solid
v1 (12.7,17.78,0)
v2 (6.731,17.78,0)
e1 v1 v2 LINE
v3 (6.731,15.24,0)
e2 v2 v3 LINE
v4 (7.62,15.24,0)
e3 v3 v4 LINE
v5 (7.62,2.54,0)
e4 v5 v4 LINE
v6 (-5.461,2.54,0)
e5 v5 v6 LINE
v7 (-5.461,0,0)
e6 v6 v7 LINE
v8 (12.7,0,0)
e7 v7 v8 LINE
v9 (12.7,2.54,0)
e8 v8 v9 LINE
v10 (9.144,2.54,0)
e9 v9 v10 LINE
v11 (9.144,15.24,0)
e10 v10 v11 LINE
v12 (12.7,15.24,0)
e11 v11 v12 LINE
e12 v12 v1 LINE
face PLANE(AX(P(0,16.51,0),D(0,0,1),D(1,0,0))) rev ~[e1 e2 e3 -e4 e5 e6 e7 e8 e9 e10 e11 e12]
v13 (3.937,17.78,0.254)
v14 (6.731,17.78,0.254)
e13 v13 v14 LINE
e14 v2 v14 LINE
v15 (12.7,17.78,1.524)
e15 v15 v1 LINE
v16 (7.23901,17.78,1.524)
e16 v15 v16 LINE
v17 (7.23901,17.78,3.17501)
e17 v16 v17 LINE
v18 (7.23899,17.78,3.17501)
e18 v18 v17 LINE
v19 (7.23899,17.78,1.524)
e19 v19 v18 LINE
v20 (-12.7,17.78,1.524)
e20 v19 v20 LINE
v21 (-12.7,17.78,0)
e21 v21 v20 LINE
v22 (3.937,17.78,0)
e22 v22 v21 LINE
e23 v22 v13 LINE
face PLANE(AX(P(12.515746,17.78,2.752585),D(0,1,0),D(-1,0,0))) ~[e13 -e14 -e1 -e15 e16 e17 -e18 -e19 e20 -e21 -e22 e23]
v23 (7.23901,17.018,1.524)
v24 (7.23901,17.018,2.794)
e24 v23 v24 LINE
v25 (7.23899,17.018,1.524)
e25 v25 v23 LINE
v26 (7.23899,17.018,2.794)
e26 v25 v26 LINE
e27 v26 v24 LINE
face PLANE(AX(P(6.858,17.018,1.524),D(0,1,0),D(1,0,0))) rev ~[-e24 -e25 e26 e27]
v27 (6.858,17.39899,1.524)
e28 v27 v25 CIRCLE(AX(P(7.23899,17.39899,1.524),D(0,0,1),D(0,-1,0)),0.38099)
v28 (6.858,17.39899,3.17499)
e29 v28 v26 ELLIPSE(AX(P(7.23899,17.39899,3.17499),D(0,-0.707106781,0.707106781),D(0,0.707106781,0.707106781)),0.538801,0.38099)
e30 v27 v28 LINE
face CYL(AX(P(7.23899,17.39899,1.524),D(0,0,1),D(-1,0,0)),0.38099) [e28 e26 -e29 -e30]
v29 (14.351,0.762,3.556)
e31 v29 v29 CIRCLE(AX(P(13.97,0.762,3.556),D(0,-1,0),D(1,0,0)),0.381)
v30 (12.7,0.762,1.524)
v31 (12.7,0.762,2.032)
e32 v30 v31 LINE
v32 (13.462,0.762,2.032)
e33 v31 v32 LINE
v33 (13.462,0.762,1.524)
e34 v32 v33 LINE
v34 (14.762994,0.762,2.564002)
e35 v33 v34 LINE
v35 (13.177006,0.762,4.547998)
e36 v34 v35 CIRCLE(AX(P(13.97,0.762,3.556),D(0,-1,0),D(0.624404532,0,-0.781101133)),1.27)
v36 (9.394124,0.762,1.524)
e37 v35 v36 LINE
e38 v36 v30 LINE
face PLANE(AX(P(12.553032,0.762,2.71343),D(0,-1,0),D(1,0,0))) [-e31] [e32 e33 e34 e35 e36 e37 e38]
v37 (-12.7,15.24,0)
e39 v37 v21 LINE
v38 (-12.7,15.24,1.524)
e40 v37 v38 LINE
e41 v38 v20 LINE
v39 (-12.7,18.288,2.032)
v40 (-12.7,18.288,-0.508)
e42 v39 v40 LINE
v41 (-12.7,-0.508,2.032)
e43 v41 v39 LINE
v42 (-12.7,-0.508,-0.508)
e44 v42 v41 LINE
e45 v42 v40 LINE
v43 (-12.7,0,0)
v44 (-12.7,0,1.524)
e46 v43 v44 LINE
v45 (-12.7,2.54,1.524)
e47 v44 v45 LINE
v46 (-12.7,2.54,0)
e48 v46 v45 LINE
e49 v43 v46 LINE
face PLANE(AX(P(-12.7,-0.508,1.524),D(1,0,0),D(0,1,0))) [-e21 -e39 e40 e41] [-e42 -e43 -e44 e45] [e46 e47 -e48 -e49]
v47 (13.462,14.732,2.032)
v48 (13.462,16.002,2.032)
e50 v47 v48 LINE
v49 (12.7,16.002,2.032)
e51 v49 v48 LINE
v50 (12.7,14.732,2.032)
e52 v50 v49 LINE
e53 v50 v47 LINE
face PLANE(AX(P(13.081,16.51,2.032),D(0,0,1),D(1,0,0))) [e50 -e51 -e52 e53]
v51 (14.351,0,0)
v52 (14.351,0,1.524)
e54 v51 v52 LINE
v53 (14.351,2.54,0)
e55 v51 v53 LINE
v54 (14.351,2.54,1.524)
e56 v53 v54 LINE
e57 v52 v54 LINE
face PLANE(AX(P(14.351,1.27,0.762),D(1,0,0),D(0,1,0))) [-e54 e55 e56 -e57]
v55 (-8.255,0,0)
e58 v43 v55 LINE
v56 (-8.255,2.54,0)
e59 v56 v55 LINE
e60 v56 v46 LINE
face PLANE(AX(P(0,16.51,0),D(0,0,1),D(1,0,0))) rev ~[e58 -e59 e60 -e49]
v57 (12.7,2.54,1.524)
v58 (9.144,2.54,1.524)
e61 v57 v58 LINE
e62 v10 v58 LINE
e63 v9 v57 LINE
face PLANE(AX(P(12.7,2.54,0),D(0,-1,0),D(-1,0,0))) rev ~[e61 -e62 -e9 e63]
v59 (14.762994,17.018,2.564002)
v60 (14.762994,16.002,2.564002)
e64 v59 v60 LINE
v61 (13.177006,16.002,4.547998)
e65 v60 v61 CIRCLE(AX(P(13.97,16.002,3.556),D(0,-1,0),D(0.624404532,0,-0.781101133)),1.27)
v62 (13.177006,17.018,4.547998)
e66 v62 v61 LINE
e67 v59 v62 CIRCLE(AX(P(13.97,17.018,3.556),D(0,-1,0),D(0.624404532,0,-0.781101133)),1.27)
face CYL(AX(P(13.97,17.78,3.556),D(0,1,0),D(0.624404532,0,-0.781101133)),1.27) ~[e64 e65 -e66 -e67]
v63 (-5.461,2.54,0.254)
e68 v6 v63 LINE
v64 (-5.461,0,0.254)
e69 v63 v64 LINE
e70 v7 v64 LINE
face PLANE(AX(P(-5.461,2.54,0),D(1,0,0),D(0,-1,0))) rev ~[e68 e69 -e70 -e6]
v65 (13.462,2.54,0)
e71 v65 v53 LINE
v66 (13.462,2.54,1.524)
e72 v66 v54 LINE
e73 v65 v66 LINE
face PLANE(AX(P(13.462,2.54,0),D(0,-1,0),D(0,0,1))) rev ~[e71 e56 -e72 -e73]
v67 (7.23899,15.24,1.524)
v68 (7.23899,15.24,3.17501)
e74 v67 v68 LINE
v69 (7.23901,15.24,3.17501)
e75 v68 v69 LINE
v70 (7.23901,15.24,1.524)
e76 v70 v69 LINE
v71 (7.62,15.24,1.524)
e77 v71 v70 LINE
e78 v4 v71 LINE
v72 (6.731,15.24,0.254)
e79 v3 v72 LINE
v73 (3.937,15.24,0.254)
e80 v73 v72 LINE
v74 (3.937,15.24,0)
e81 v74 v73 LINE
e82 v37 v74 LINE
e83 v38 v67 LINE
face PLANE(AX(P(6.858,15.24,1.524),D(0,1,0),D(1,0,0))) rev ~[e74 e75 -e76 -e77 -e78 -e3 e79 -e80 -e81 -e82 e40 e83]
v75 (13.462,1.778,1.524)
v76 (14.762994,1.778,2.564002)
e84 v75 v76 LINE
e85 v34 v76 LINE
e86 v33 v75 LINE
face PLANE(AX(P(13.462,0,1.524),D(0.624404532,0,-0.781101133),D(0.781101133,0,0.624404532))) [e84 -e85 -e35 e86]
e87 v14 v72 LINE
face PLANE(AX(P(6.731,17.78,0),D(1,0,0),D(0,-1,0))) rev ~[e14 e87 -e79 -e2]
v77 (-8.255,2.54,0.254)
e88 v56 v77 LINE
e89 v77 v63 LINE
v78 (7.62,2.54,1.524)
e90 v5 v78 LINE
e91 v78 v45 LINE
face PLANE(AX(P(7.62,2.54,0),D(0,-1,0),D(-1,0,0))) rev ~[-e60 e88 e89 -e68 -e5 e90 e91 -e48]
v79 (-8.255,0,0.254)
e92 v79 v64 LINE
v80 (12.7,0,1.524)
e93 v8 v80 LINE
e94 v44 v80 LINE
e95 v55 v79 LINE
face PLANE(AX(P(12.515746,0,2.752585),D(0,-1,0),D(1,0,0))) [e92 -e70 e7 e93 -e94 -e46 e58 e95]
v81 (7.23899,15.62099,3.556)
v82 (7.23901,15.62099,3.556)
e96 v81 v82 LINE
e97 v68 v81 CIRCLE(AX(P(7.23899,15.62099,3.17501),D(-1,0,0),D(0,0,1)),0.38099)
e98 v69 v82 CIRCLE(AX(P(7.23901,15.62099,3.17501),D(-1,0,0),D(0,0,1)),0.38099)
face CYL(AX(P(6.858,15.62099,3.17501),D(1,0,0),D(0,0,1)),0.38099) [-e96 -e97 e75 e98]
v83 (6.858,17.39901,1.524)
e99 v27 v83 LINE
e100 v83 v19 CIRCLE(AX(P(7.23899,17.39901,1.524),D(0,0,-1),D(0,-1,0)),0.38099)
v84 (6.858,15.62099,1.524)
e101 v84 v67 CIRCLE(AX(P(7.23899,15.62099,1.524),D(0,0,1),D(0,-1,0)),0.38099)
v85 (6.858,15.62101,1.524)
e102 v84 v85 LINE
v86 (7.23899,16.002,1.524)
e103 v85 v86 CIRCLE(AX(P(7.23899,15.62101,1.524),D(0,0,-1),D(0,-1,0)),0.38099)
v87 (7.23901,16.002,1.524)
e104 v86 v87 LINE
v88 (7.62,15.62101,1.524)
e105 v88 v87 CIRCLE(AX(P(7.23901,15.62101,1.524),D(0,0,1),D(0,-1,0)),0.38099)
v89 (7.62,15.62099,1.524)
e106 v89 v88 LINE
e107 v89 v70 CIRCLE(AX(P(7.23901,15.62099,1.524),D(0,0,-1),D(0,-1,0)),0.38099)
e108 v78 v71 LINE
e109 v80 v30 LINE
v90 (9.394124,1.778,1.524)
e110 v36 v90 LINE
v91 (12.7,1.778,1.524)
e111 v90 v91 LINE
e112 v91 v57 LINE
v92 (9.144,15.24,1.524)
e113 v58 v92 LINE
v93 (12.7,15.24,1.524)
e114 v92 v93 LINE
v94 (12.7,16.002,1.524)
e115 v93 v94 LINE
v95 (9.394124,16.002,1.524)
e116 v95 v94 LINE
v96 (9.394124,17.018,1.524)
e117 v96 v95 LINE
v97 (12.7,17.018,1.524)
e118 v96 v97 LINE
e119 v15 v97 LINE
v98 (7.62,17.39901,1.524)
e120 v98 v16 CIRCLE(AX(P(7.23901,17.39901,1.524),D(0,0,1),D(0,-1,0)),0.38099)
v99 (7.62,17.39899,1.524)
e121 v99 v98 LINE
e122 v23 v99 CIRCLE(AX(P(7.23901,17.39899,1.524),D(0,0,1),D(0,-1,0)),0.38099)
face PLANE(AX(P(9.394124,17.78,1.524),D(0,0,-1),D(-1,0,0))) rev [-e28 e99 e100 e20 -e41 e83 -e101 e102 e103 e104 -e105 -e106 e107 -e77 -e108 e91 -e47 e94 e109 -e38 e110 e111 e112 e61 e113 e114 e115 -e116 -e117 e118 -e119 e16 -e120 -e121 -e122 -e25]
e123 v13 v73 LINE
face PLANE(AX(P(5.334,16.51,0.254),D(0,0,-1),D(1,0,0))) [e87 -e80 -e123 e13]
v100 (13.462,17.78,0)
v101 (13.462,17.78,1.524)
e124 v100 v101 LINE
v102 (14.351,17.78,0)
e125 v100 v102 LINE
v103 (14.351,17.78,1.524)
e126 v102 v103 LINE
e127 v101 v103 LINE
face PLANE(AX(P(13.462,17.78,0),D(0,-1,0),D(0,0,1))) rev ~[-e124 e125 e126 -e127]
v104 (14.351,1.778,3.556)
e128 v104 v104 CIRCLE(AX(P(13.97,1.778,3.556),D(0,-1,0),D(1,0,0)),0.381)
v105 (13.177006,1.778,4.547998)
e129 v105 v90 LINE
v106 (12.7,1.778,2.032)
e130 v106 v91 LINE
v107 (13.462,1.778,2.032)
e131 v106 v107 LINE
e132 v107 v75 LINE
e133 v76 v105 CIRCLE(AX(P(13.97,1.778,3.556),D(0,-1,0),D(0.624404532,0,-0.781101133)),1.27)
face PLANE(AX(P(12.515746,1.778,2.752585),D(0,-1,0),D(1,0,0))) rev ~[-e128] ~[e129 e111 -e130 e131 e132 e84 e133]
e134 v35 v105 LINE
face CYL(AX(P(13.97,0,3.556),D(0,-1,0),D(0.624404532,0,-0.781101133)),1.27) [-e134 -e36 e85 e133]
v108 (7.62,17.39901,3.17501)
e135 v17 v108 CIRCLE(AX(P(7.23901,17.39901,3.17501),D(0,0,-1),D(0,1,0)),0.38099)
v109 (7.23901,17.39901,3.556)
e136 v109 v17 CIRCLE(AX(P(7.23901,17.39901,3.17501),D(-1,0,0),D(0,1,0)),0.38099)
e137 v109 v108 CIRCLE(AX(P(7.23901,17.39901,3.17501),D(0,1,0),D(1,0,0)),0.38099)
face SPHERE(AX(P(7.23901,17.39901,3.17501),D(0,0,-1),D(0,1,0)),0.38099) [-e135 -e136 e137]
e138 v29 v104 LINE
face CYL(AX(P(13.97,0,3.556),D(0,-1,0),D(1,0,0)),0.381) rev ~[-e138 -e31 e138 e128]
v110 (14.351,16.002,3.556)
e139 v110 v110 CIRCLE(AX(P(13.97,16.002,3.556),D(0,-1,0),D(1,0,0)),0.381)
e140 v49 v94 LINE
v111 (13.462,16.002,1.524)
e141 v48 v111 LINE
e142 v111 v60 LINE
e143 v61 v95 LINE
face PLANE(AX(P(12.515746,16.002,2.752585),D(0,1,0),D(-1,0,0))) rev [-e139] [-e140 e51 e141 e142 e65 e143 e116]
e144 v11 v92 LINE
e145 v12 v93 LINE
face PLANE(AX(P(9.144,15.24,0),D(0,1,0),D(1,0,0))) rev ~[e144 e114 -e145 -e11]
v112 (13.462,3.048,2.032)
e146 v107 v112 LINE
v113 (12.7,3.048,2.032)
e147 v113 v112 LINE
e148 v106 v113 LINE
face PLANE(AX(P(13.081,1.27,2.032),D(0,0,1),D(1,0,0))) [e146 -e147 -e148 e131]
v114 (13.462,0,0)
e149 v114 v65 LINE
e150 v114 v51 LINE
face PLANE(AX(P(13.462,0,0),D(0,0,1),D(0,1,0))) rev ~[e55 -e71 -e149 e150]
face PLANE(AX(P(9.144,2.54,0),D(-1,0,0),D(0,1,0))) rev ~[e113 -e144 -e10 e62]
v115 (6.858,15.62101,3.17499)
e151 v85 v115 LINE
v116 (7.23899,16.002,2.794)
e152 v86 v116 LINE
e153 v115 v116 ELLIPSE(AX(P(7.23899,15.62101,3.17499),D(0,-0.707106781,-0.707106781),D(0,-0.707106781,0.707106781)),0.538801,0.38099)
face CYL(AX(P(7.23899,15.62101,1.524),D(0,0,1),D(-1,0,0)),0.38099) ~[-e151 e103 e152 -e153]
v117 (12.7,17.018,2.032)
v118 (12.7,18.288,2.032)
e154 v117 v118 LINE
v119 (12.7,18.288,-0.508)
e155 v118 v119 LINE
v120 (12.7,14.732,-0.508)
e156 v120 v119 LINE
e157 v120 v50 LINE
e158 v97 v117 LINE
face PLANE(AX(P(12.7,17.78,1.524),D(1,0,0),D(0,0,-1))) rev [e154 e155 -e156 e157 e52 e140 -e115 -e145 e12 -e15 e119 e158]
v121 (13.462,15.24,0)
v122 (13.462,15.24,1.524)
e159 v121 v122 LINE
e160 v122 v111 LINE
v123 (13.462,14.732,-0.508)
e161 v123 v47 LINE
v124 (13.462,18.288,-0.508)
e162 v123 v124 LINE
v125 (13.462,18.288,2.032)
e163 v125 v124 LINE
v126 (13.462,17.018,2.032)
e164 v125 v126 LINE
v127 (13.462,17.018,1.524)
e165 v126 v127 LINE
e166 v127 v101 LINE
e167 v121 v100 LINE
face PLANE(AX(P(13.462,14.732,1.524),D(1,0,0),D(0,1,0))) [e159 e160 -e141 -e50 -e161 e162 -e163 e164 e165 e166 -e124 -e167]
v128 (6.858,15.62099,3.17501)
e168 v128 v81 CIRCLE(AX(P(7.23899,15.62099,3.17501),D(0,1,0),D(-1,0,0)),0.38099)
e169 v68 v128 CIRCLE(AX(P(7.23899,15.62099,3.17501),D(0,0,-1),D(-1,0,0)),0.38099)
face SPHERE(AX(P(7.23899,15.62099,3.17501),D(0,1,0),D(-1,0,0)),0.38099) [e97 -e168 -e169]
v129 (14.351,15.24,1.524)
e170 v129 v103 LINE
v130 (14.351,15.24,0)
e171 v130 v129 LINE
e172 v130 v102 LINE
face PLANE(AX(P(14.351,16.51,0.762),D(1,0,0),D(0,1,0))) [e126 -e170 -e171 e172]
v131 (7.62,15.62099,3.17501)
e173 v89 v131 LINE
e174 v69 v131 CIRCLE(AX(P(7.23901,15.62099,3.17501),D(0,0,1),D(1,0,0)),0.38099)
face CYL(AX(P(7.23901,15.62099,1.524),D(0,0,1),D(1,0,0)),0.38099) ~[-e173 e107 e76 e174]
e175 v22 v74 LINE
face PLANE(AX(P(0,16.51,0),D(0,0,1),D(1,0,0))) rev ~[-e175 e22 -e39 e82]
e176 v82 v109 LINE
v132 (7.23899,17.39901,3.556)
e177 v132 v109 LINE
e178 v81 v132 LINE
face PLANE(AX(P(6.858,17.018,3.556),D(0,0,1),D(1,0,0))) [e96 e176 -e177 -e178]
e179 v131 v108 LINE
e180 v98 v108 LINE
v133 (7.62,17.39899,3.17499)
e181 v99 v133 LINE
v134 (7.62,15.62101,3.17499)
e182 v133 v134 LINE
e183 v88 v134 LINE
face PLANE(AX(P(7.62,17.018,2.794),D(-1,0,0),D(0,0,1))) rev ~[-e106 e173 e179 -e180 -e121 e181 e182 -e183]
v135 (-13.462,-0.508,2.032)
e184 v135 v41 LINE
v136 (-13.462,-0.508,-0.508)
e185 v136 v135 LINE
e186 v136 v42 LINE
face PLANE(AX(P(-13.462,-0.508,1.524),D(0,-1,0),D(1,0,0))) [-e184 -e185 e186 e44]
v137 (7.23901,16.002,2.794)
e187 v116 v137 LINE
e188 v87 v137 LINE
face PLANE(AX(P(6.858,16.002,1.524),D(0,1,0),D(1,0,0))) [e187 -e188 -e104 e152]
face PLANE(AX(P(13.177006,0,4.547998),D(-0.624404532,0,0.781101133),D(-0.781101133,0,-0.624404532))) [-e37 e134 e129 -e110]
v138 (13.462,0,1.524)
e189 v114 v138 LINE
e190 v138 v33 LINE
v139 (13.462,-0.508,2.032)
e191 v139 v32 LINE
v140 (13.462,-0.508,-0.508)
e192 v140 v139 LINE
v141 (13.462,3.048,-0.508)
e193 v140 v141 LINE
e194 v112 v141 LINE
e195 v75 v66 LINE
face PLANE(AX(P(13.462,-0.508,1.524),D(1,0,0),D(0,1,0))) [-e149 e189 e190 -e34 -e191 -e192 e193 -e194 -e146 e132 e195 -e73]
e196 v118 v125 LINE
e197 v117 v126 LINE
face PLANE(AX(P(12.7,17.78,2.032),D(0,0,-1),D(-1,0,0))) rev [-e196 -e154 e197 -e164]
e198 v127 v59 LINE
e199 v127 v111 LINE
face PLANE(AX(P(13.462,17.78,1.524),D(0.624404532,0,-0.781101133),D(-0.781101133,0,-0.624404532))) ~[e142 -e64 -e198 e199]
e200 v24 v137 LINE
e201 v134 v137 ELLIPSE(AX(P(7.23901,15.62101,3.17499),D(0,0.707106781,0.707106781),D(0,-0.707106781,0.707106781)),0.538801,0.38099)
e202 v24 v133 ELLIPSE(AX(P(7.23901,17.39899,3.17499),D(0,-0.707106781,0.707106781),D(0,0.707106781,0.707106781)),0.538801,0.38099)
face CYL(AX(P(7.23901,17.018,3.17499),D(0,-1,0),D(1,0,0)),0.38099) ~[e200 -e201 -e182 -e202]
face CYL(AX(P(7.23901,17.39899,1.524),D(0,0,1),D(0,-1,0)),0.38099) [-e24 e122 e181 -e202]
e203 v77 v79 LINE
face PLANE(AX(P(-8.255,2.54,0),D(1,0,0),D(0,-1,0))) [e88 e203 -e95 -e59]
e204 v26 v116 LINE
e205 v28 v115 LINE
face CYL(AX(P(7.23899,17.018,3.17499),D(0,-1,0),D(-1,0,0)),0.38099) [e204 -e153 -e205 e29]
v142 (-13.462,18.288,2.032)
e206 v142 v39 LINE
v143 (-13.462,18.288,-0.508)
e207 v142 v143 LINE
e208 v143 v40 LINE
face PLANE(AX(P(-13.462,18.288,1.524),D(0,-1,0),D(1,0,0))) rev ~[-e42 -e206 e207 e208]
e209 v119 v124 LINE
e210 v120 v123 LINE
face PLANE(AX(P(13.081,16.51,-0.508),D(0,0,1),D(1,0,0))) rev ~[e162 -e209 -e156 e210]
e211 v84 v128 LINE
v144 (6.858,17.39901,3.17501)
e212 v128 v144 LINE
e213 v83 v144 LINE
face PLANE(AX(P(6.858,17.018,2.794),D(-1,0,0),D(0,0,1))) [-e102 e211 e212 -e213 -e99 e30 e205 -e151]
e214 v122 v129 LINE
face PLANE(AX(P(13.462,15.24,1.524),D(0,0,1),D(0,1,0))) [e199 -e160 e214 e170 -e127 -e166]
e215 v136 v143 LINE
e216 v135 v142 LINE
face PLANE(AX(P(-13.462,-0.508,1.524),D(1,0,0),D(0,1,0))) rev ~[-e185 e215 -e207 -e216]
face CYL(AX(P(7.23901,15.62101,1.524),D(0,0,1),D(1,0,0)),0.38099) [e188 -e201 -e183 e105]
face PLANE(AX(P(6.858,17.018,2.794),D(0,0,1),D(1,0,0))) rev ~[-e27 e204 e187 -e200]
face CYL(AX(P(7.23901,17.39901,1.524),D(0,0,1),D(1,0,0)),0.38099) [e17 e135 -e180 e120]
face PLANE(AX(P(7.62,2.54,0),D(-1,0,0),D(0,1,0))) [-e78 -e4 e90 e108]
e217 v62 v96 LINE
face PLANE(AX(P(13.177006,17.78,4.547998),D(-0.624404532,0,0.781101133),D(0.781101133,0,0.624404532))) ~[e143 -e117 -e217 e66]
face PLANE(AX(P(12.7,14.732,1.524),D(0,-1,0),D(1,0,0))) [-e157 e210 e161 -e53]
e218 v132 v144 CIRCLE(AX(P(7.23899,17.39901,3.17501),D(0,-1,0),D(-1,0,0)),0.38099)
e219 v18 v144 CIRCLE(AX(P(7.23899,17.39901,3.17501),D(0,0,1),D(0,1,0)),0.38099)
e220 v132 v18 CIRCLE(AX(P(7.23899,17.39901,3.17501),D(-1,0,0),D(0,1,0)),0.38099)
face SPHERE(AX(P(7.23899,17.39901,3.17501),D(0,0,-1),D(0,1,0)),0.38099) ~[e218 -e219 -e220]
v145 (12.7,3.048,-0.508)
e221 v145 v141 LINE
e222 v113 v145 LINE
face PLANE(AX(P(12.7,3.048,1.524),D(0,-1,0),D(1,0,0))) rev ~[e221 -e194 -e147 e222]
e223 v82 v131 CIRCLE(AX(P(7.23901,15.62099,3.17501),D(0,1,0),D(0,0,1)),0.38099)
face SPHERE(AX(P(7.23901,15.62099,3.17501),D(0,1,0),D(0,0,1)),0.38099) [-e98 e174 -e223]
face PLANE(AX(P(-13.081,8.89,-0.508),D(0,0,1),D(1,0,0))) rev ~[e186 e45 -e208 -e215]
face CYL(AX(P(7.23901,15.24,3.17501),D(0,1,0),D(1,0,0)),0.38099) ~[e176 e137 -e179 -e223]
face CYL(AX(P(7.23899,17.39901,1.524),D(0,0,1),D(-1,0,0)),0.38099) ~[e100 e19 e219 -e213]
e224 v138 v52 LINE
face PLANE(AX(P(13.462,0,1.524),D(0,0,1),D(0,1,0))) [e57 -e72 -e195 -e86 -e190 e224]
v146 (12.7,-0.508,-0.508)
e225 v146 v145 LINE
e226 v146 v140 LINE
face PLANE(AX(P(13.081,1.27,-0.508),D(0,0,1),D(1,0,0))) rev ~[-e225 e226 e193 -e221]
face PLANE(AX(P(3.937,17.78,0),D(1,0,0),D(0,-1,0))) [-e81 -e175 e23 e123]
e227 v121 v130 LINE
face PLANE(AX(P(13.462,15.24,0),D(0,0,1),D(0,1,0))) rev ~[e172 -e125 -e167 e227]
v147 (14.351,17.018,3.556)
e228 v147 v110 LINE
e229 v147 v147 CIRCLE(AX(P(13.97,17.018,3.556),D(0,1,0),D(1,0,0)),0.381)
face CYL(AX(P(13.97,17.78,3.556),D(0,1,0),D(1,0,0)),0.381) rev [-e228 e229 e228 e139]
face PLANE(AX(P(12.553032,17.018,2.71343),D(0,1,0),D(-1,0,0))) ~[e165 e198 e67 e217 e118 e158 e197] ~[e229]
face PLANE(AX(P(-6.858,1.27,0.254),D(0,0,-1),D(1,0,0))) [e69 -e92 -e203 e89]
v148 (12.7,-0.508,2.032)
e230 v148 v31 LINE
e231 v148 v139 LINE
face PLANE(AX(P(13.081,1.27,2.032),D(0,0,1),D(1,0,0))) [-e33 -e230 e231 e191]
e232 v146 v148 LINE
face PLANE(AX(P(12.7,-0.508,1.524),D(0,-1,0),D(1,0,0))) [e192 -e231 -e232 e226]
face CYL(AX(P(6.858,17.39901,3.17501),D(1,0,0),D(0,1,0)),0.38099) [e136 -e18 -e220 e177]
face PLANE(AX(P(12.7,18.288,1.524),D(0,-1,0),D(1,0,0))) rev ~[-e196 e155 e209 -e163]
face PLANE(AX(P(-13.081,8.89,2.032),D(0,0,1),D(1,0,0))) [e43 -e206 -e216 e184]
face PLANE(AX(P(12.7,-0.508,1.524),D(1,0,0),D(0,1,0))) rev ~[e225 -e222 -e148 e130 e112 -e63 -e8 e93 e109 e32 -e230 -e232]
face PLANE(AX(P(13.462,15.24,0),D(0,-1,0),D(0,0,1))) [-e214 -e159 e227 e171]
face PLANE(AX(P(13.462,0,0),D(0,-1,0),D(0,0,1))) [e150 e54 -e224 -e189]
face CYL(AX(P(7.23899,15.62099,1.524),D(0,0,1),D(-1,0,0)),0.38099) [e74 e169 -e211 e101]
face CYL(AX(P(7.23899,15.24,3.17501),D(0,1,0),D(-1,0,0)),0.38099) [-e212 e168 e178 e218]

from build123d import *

# Parameters (mm, degrees)
F0_W          = 1.524
F0_H          = 12.7
F1_DEPTH      = 1.524
F2_W          = 0.762
F2_H          = 18.796
F2_H_2        = 3.556
F3_DEPTH      = 0.508
F3_DEPTH_BACK = 2.032
F4_R          = 0.381
F5_DEPTH      = 1.778
F7_DEPTH      = 0.762
F9_W          = 2.794
F9_H          = 2.54
F10_DEPTH     = 0.254
F11_W         = 2.54
F11_H         = 1.524
F12_DEPTH     = 0.889
F13_W         = 2.54
F13_H         = 1.524
F14_DEPTH     = 0.889
F15_W         = 0.762
F15_H         = 0.762
F16_DEPTH     = 2.032
F17_W         = 0.762
F17_H         = 0.762
F18_DEPTH     = 1.016
F19_R         = 0.38099


# Not quite as in the source:
# - a fillet or chamfer is up to 0.001 mm smaller than in the source, because OpenCascade refuses the exact size
# - a pattern or mirror of a feature is missing from the dataset's text; its kind, count and spacing are read off the source's solid


with BuildPart() as f1:
    # F0 (on Top) → F1 (new body)
    with BuildSketch(Plane.XY):
        Polygon((-12.7, 17.78), (-12.7, 15.24), (7.62, 15.24), (9.144, 15.24), (12.7, 15.24), (12.7, 17.78), align=None)
        Polygon((-12.7, 0), (-12.7, 2.54), (-12.7, 15.24), (-12.7, 17.78), (-12.7, 18.288), (-13.462, 18.288), (-13.462, -0.508), (-12.7, -0.508), align=None)
        Polygon((7.62, 2.54), (-12.7, 2.54), (-12.7, 0), (12.7, 0), (12.7, 2.54), (9.144, 2.54), align=None)
        with Locations((8.382, 8.89)):
            Rectangle(F0_W, F0_H)
        Polygon((12.7, 2.54), (12.7, 0), (12.7, -0.508), (13.462, -0.508), (13.462, 3.048), (12.7, 3.048), align=None)
        Polygon((12.7, 18.288), (12.7, 17.78), (12.7, 15.24), (12.7, 14.732), (13.462, 14.732), (13.462, 18.288), align=None)
    extrude(amount=F1_DEPTH)

    # F2 (on face) → F3 (join, two sides)
    with BuildSketch(Plane.XY.offset(1.524)) as f3_sk:
        with Locations((-13.081, 8.89)):
            Rectangle(F2_W, F2_H)
        with Locations((13.081, 16.51)):
            Rectangle(F2_W, F2_H_2)
        with Locations((13.081, 1.27)):
            Rectangle(F2_W, F2_H_2)
    extrude(amount=F3_DEPTH)
    extrude(f3_sk.sketch, amount=-F3_DEPTH_BACK)

    # F4 (on face) → F5 (join)
    with BuildSketch(Plane.XZ):
        with BuildLine():
            Line((13.462, 1.524), (14.762993756, 2.564001561))
            ThreePointArc((14.762993756, 2.564001561), (14.961998439, 4.348993756), (13.177006244, 4.547998439))
            Line((13.177006244, 4.547998439), (9.3941243381, 1.524))
            Line((9.3941243381, 1.524), (13.462, 1.524))
        make_face()
        with Locations((13.97, 3.556)):
            Circle(F4_R, mode=Mode.SUBTRACT)
    f5 = extrude(amount=-F5_DEPTH)

    # F5_copies: F5 across plane
    add(f5.mirror(Plane.ZX.offset(8.89)))

    # F6 (on face) → F7 (cut)
    with BuildSketch(Plane.XZ):
        with BuildLine():
            Line((13.177006244, 4.547998439), (9.3941243381, 1.524))
            Line((9.3941243381, 1.524), (12.7, 1.524))
            Line((12.7, 1.524), (12.7, 2.032))
            Line((12.7, 2.032), (13.462, 2.032))
            Line((13.462, 2.032), (13.462, 1.524))
            Line((13.462, 1.524), (14.762993756, 2.564001561))
            ThreePointArc((14.762993756, 2.564001561), (14.961998439, 4.348993756), (13.177006244, 4.547998439))
        make_face()
    f7 = extrude(amount=-F7_DEPTH, mode=Mode.SUBTRACT)

    # F7_copies: F7 across plane
    add(f7.mirror(Plane.ZX.offset(8.89)), mode=Mode.SUBTRACT)

    # F9 (on face) → F10 (cut)
    with BuildSketch(Plane(origin=(0, 0, 0), x_dir=(1, 0, 0), z_dir=(0, 0, -1))):
        with Locations((5.334, -16.51)):
            Rectangle(F9_W, F9_H)
        with Locations((-6.858, -1.27)):
            Rectangle(F9_W, F9_H)
    extrude(amount=-F10_DEPTH, mode=Mode.SUBTRACT)

    # F11 (on face) → F12 (join)
    with BuildSketch(Plane.YZ.offset(13.462)):
        with Locations((1.27, 0.762)):
            Rectangle(F11_W, F11_H)
    extrude(amount=F12_DEPTH)

    # F13 (on face) → F14 (join)
    with BuildSketch(Plane.YZ.offset(13.462)):
        with Locations((16.51, 0.762)):
            Rectangle(F13_W, F13_H)
    extrude(amount=F14_DEPTH)

    # F15 (on face) → F16 (join)
    with BuildSketch(Plane.XY.offset(1.524)):
        with Locations((7.239, 15.621)):
            Rectangle(F15_W, F15_H)
        with Locations((7.239, 17.399)):
            Rectangle(F15_W, F15_H)
    extrude(amount=F16_DEPTH)

    # F17 (on face) → F18 (join, through all)
    with BuildSketch(Plane.XZ.offset(-17.018)):
        with Locations((7.239, 3.175)):
            Rectangle(F17_W, F17_H)
    extrude(amount=F18_DEPTH)

    # F19 (radius 0.381 in the source; OpenCascade refuses exactly that, so slightly less here)
    f19_edges = [f1.edges().sort_by_distance(p)[0] for p in [
        (6.858, 17.78, 2.54),
        (7.62, 17.78, 2.54),
        (7.239, 17.78, 3.556),
        (6.858, 16.51, 3.556),
        (7.62, 16.51, 3.556),
        (6.858, 17.018, 2.159),
        (6.858, 16.51, 2.794),
        (6.858, 16.002, 2.159),
        (6.858, 15.24, 2.54),
        (7.239, 15.24, 3.556),
        (7.62, 17.018, 2.159),
        (7.62, 16.51, 2.794),
        (7.62, 16.002, 2.159),
        (7.62, 15.24, 2.54),
    ]]
    fillet(f19_edges, radius=F19_R)


solid = f1.part
